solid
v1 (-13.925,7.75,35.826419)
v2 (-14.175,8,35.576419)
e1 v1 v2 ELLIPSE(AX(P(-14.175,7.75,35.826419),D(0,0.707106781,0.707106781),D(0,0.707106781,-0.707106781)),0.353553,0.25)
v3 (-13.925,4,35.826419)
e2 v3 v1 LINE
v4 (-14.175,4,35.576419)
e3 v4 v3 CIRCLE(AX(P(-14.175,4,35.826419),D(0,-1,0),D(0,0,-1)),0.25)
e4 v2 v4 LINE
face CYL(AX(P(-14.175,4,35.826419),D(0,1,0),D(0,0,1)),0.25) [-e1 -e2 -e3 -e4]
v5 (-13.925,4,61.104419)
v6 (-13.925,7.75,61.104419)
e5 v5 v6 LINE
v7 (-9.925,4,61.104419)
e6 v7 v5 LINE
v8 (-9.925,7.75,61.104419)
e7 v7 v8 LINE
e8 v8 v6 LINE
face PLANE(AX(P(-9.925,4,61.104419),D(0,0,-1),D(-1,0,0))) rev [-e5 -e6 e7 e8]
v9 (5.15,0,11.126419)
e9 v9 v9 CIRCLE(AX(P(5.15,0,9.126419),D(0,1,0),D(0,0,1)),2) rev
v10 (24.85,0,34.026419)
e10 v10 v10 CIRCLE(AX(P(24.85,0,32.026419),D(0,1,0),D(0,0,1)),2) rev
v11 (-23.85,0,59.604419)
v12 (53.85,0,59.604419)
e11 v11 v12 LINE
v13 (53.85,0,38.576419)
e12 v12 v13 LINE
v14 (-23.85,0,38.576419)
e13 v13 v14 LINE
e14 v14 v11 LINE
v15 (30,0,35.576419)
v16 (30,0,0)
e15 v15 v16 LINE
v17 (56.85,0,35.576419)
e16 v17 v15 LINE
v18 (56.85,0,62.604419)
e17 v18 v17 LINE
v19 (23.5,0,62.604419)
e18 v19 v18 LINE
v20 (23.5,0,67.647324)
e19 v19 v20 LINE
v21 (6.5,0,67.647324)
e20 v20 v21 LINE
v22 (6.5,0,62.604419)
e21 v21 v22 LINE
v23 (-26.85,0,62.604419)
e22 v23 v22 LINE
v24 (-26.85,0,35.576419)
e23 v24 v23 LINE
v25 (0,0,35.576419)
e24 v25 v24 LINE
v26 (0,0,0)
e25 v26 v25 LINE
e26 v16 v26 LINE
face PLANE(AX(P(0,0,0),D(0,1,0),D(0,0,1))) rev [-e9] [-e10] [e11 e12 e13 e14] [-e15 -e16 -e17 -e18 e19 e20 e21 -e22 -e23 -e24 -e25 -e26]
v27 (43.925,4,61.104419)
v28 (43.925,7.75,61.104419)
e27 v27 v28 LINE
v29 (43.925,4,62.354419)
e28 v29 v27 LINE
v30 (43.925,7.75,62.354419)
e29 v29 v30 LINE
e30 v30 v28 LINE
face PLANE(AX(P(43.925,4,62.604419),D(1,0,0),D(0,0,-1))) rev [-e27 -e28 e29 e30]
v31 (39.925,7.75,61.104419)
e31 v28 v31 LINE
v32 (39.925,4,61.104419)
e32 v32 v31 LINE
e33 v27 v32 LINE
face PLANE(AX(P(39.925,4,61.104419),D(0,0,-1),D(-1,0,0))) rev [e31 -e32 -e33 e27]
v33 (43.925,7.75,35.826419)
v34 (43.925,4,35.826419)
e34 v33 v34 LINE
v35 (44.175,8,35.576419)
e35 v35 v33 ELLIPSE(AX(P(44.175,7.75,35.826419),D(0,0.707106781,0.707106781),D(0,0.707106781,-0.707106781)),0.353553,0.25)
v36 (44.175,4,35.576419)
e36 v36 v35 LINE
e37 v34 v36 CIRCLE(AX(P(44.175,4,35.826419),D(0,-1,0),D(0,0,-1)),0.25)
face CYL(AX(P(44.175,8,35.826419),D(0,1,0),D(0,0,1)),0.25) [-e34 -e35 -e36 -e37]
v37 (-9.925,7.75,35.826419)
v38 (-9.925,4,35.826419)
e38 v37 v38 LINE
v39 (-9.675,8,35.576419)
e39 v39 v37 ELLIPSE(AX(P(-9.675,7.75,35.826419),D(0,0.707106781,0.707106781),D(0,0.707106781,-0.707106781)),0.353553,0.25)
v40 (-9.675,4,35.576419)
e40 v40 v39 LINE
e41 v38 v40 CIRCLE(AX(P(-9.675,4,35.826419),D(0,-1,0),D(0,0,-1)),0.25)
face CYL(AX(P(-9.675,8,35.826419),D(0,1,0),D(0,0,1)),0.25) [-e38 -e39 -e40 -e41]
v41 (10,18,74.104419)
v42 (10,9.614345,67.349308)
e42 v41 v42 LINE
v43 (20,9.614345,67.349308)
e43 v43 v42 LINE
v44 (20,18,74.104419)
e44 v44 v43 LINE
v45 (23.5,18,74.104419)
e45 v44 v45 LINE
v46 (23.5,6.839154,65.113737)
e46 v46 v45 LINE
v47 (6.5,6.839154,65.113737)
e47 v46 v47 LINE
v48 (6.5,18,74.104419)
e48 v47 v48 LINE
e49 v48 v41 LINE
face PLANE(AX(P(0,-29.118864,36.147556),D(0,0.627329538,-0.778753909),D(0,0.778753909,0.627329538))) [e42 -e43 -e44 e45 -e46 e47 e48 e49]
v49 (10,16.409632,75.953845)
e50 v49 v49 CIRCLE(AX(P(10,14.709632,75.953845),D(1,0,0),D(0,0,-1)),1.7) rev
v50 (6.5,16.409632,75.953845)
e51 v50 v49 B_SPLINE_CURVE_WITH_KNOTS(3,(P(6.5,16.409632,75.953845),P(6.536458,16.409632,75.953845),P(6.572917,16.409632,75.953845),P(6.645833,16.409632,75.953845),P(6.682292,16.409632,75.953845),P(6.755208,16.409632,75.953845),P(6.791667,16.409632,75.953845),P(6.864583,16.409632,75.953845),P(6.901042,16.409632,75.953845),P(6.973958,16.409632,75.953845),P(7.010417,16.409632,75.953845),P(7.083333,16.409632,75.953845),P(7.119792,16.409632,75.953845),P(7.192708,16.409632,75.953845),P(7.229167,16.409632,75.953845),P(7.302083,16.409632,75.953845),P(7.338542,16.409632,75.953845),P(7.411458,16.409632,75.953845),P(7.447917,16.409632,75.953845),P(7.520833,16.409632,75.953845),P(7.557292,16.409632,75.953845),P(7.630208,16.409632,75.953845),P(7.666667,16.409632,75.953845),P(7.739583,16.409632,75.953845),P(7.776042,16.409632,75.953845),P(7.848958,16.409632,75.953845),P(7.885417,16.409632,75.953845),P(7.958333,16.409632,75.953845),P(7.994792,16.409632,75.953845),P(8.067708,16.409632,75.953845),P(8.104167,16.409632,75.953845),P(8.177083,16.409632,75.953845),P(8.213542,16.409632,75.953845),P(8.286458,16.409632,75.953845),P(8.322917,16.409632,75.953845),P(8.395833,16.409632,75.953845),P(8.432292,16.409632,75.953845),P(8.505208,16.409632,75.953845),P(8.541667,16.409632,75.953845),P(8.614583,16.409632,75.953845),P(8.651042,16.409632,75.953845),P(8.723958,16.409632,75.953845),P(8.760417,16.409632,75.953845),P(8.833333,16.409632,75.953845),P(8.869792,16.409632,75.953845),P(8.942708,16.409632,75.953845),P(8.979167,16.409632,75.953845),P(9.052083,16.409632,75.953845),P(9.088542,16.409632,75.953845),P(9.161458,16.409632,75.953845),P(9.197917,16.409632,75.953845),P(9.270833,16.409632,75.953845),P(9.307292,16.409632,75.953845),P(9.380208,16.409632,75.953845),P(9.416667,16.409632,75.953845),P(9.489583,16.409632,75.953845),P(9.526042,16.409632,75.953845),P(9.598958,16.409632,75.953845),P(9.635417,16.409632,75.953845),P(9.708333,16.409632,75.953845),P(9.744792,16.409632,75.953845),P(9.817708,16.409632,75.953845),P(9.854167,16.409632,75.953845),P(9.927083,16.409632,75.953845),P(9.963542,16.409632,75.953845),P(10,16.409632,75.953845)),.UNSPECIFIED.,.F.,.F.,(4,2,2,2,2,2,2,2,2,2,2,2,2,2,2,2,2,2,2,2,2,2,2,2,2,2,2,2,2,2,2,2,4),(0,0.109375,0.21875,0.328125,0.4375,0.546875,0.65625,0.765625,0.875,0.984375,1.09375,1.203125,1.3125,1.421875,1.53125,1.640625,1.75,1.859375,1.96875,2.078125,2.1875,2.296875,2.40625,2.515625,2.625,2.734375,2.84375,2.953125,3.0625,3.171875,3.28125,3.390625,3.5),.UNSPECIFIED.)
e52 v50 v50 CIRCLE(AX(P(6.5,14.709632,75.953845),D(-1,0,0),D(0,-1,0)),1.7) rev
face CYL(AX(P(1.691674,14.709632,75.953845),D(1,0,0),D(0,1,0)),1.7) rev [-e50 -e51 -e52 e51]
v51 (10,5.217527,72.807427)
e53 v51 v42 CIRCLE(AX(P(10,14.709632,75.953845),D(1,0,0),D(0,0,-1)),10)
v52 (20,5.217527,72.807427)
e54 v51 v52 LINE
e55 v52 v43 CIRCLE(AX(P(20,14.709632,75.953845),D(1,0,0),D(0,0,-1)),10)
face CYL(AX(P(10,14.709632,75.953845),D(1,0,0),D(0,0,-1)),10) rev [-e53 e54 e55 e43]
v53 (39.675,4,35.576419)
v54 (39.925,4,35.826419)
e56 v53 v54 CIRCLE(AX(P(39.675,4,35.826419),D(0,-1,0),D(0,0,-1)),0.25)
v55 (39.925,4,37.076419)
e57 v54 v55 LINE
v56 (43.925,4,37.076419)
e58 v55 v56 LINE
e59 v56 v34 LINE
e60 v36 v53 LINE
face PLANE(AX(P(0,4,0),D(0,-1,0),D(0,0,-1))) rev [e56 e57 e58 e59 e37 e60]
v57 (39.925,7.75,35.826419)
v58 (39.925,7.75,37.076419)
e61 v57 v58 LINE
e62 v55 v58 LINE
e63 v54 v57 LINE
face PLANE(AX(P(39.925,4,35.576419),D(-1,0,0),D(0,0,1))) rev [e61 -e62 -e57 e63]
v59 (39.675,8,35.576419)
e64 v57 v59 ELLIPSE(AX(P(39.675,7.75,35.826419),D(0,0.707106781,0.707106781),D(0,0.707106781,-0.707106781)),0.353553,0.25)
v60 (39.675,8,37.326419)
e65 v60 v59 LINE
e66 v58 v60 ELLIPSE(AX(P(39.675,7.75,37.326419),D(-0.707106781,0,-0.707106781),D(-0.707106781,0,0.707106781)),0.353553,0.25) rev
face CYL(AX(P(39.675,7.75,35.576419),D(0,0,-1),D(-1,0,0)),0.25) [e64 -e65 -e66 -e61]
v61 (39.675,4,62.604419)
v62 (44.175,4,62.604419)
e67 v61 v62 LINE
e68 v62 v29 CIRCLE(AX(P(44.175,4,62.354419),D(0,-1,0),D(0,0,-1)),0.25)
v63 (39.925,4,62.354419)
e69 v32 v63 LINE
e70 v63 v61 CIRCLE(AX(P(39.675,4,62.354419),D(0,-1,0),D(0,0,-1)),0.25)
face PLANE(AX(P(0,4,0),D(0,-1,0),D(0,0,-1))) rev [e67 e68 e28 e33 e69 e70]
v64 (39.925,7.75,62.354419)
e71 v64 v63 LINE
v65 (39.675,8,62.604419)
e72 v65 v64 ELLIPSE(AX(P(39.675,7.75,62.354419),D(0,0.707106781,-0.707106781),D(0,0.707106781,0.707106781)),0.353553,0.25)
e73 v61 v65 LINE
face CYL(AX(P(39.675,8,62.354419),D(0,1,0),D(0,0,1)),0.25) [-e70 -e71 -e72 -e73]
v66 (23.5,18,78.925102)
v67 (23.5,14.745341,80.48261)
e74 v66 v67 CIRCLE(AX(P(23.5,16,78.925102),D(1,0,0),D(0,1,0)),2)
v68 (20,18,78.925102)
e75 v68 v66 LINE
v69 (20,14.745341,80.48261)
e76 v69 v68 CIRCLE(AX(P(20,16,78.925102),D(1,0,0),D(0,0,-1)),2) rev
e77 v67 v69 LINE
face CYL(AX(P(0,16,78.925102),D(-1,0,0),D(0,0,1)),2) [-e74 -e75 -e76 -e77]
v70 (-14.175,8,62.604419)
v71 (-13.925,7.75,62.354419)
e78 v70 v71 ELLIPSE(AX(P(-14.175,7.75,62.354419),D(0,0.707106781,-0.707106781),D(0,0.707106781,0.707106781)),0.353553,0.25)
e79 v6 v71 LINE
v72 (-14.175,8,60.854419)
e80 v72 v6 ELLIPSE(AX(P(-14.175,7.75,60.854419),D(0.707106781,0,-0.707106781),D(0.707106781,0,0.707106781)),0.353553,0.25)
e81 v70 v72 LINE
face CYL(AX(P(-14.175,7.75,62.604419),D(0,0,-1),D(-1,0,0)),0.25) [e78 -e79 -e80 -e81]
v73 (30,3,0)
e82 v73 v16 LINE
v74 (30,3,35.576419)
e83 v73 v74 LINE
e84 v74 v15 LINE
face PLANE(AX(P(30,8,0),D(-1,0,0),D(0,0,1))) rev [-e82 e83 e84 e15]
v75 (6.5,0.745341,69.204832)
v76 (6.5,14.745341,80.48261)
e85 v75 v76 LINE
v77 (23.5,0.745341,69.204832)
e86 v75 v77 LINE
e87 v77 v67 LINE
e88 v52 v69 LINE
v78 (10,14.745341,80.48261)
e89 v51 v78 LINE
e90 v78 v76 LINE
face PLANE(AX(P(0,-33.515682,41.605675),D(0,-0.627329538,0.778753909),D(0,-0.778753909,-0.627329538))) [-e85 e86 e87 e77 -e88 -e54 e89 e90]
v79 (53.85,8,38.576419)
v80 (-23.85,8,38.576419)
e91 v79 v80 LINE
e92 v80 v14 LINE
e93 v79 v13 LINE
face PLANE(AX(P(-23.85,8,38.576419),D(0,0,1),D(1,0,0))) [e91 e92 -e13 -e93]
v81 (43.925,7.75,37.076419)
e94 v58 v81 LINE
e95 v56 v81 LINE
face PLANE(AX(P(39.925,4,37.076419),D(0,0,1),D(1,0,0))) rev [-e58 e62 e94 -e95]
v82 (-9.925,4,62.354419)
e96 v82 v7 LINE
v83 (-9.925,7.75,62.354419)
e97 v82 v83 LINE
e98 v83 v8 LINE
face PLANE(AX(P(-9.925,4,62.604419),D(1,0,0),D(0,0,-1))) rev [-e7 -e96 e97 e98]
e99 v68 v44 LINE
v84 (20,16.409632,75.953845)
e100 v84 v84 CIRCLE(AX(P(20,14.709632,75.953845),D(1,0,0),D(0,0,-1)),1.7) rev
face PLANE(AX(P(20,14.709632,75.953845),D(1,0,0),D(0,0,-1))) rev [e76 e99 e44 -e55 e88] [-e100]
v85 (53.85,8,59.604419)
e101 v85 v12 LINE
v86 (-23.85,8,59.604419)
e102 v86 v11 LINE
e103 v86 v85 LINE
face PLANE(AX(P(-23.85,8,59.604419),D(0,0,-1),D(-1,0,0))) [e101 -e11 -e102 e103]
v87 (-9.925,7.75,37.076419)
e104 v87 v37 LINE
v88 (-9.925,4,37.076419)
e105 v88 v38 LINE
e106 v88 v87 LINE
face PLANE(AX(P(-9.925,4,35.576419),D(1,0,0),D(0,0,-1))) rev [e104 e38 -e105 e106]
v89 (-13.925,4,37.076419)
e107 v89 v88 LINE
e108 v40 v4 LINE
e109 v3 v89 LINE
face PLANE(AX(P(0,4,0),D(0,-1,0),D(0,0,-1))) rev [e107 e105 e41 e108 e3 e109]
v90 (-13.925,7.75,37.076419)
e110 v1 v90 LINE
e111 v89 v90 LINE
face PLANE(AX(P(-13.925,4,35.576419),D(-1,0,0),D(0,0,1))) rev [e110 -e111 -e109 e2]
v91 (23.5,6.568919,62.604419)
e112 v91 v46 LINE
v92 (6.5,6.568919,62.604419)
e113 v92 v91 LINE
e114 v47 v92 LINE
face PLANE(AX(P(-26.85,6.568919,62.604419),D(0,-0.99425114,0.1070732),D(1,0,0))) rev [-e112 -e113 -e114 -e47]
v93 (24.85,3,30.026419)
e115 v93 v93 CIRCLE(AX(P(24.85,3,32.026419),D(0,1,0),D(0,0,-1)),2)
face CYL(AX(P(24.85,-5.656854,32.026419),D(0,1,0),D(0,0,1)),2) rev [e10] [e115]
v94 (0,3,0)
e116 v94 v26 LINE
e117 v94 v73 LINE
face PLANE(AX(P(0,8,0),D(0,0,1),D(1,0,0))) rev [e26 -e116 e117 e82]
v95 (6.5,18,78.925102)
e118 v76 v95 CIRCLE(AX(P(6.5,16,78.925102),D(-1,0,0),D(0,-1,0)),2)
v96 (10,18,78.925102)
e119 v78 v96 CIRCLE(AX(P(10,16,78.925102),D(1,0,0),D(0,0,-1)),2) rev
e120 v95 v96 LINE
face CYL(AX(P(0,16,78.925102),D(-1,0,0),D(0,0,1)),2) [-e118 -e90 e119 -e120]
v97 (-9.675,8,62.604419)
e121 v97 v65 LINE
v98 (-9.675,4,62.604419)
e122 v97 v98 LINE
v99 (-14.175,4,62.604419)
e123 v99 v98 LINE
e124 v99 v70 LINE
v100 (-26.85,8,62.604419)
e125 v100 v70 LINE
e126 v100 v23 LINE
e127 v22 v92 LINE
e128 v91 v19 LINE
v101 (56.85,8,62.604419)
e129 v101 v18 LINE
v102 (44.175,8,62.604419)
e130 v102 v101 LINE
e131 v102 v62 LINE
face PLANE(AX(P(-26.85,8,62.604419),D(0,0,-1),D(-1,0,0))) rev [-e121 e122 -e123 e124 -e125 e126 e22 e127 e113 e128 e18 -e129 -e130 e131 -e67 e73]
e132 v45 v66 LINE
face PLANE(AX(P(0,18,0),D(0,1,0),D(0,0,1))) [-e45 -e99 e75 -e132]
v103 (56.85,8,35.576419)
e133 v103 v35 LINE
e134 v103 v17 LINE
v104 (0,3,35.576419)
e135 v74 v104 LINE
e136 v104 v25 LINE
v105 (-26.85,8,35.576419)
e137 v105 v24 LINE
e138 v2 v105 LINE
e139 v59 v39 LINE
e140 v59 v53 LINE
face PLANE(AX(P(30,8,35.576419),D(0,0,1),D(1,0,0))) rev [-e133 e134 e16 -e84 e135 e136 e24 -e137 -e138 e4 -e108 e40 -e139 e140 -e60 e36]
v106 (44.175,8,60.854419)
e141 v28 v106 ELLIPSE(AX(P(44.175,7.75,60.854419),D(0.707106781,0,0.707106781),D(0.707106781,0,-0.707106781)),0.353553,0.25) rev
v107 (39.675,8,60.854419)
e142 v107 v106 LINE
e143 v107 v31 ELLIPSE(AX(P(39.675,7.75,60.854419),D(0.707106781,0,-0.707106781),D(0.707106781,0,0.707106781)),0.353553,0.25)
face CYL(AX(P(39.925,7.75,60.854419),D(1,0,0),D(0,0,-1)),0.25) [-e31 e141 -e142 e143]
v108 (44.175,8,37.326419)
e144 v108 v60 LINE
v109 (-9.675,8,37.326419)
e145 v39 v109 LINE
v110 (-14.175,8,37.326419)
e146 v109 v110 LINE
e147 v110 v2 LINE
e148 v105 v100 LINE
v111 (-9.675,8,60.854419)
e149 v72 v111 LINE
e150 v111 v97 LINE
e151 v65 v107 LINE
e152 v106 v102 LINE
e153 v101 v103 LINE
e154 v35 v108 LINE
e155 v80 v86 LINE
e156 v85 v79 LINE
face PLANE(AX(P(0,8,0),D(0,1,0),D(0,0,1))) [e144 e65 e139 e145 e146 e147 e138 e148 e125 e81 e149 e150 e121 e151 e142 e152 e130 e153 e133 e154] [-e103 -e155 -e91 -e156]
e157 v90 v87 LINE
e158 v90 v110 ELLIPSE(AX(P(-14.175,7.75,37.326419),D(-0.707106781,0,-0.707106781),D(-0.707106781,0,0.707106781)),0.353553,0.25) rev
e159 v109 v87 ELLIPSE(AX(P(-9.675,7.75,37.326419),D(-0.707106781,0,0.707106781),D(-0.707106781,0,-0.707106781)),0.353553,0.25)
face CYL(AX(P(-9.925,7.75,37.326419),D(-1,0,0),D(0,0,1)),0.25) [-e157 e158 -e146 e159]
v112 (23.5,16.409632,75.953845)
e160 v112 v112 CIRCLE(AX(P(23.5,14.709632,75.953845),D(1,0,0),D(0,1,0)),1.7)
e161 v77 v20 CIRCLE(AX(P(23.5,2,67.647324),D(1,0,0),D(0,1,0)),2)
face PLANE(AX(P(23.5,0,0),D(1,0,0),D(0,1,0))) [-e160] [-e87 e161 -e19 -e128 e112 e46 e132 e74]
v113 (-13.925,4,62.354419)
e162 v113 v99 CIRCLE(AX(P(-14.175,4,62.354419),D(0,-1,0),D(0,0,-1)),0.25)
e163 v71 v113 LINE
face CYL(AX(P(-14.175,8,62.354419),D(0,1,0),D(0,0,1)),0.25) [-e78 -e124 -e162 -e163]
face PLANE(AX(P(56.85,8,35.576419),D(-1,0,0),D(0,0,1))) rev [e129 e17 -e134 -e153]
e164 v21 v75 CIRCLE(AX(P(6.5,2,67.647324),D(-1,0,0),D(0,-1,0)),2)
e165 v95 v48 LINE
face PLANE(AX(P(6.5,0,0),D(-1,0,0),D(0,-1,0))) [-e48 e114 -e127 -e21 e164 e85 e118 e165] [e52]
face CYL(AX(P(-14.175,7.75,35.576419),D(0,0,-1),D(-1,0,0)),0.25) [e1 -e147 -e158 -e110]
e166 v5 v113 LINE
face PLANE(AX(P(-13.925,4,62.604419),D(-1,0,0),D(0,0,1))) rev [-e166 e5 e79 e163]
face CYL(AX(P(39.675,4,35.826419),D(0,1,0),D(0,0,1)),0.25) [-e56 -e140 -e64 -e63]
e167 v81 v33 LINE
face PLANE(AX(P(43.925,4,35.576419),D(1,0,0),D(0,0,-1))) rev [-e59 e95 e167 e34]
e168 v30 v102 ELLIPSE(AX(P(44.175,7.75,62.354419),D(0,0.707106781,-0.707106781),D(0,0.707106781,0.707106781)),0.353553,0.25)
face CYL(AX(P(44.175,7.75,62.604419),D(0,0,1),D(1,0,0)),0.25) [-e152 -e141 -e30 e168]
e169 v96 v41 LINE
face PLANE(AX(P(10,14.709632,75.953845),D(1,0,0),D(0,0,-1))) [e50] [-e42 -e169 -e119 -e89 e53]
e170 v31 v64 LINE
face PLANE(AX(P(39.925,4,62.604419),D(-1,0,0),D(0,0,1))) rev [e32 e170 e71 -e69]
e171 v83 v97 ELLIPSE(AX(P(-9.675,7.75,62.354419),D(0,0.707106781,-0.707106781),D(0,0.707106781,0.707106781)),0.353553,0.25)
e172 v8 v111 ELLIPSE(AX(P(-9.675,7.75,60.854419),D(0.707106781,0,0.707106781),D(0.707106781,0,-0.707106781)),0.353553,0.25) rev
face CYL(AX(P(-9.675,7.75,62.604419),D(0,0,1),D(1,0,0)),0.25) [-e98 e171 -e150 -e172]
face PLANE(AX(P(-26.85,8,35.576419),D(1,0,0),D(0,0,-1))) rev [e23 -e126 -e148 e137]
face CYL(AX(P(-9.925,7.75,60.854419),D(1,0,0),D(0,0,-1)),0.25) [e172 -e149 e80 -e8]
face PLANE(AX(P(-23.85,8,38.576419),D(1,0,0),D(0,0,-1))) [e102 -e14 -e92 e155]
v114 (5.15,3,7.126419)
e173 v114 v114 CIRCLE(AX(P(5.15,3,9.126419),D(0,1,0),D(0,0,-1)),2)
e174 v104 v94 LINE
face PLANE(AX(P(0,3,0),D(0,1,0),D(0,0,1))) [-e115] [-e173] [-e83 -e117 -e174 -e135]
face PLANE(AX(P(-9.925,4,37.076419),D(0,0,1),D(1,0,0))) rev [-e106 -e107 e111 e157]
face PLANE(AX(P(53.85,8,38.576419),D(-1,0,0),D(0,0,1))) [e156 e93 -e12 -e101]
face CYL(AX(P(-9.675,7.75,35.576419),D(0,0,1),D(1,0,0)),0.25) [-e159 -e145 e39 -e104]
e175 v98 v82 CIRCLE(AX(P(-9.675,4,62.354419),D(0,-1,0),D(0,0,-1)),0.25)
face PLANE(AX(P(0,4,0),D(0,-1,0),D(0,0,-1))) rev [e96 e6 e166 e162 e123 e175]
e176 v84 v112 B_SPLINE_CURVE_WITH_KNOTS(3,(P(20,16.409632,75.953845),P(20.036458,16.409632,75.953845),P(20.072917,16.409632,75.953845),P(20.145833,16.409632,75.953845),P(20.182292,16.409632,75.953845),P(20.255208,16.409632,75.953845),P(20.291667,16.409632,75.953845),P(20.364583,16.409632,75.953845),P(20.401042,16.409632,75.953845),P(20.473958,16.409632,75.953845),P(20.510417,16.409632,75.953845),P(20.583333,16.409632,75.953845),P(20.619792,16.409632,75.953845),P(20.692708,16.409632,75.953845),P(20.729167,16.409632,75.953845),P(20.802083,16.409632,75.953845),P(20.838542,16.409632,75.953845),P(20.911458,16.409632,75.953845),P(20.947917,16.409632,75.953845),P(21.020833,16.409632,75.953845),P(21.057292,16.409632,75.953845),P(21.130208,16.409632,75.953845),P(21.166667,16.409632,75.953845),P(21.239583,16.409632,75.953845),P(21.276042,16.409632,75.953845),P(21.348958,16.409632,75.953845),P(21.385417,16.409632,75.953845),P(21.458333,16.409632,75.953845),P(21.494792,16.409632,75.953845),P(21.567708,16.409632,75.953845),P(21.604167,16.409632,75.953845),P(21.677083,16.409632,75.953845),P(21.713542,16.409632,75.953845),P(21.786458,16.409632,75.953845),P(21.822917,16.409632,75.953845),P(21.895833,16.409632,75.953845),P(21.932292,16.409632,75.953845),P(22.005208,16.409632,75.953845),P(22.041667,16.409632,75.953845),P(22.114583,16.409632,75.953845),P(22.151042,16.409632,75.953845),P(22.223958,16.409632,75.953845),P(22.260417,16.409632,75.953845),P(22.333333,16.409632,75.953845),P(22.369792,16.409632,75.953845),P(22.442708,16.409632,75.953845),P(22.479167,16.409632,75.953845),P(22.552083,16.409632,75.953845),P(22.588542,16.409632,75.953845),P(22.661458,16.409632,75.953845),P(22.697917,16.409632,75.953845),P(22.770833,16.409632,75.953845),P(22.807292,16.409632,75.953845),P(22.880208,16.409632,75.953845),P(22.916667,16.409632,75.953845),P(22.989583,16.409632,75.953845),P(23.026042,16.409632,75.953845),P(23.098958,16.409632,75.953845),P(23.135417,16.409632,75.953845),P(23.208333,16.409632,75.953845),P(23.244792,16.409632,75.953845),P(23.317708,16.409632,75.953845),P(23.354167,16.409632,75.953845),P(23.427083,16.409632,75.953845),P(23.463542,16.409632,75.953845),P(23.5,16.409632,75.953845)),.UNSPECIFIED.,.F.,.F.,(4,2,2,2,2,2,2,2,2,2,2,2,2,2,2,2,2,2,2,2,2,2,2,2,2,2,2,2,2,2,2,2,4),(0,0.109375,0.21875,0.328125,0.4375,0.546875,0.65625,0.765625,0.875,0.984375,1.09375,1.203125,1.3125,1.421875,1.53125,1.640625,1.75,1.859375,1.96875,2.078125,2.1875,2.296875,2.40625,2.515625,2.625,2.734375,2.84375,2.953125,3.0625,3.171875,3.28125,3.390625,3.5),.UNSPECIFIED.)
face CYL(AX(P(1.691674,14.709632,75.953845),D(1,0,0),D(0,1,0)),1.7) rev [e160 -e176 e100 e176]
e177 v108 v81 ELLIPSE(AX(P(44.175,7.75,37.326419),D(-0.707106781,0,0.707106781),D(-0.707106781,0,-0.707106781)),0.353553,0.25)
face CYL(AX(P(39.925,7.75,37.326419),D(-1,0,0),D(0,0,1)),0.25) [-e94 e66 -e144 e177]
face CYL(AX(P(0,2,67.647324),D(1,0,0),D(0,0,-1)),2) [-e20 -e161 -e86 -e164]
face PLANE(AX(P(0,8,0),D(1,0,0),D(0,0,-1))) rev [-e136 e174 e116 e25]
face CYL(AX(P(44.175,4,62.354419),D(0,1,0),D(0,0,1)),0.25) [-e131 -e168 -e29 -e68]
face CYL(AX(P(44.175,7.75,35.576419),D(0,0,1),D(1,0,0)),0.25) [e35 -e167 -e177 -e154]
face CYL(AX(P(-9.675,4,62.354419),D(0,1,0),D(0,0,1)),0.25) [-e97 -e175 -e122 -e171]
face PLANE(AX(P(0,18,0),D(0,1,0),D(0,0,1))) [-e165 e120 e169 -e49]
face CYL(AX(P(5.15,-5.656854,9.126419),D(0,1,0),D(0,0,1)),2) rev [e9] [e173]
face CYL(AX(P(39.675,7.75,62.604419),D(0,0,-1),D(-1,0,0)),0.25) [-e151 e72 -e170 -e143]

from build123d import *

# Parameters (mm, degrees)
SKETCH5_W           = 77.7
SKETCH5_H           = 21.028
BOSS_EXTRUDE3_DEPTH = 8
SKETCH6_W           = 30
SKETCH6_H           = 35.57641867
CUT_EXTRUDE4_DEPTH  = 5
SKETCH10_R          = 1.7
CUT_EXTRUDE5_DEPTH  = 17
FILLET4_R           = 2
FILLET5_R           = 2
CHAMFER1_START      = 6.5
CHAMFER1_DEPTH      = 17
SKETCH11_R          = 10
CUT_EXTRUDE6_DEPTH  = 5
SKETCH12_R          = 2
CUT_EXTRUDE7_DEPTH  = 3
SKETCH13_W          = 4
SKETCH13_H          = 1.5
CUT_EXTRUDE8_DEPTH  = 4
FILLET6_R           = 0.25


with BuildPart() as part:
    # Sketch5 → Boss-Extrude3 (new body)
    with BuildSketch(Plane(origin=(0, 0, 0), x_dir=(1, 0, 0), z_dir=(0, 1, 0))):
        Polygon((30, -35.57641867), (56.85, -35.57641867), (56.85, -62.60441867), (-26.85, -62.60441867), (-26.85, -35.57641867), (0, -35.57641867), (0, 0), (30, 0), align=None)
        with Locations((15, -49.09041867)):
            Rectangle(SKETCH5_W, SKETCH5_H, mode=Mode.SUBTRACT)
    extrude(amount=BOSS_EXTRUDE3_DEPTH)

    # Sketch6 → Cut-Extrude4 (cut)
    with BuildSketch(Plane(origin=(0, 8, 0), x_dir=(1, 0, 0), z_dir=(0, 1, 0))):
        with Locations((15, -17.788209335)):
            Rectangle(SKETCH6_W, SKETCH6_H)
    extrude(amount=-CUT_EXTRUDE4_DEPTH, mode=Mode.SUBTRACT)

    # Sketch7 → Loft1 section 0
    with BuildSketch(Plane.XZ):
        with BuildLine():
            Line((6.5, 59.60441867), (23.5, 59.60441867))
            Line((23.5, 59.60441867), (23.5, 68.60441867))
            Line((23.5, 68.60441867), (6.5, 68.60441867))
            Line((6.5, 68.60441867), (6.5, 59.60441867))
        make_face()
    # Sketch9 → Loft1 section 1
    with BuildSketch(Plane(origin=(0, 18, 0), x_dir=(-1, 0, 0), z_dir=(0, -1, 0))):
        with BuildLine():
            Line((-23.5, -83.10441867), (-6.5, -83.10441867))
            Line((-6.5, -83.10441867), (-6.5, -74.10441867))
            Line((-6.5, -74.10441867), (-23.5, -74.10441867))
            Line((-23.5, -74.10441867), (-23.5, -83.10441867))
        make_face()
    loft()

    # Sketch10 → Cut-Extrude5 (cut)
    with BuildSketch(Plane(origin=(23.5, 0, 0), x_dir=(0, 0, -1), z_dir=(1, 0, 0))):
        with Locations(Location((-75.953844744, 14.709632368, 0), (0, 0, 90))):
            Circle(SKETCH10_R)
    extrude(amount=-CUT_EXTRUDE5_DEPTH, mode=Mode.SUBTRACT)

    # Fillet4
    fillet4_edges = [part.edges().sort_by_distance(p)[0] for p in [
        (15, 0, 68.60441867),
    ]]
    fillet(fillet4_edges, radius=FILLET4_R)

    # Fillet5
    fillet5_edges = [part.edges().sort_by_distance(p)[0] for p in [
        (15, 18, 83.10441867),
    ]]
    fillet(fillet5_edges, radius=FILLET5_R)

    # Chamfer1: read off the stored shape, not the designer's step
    # Chamfer1 outline → Chamfer1 (add)
    with BuildSketch(Plane.YZ.offset(CHAMFER1_START)):
        Polygon((6.568919305, 62.60441867), (6.839153567, 65.113736821), (3.724137931, 62.60441867), align=None)
    extrude(amount=CHAMFER1_DEPTH)

    # Sketch11 → Cut-Extrude6 (cut, symmetric)
    with BuildSketch(Plane(origin=(15, 0, 0), x_dir=(0, 0, -1), z_dir=(1, 0, 0))):
        with Locations((-75.953844744, 14.709632368)):
            Circle(SKETCH11_R)
    extrude(amount=CUT_EXTRUDE6_DEPTH, both=True, mode=Mode.SUBTRACT)

    # Sketch12 → Cut-Extrude7 (cut)
    with BuildSketch(Plane(origin=(0, 3, 0), x_dir=(1, 0, 0), z_dir=(0, 1, 0))):
        with Locations(Location((24.85, -32.02641867, 0), (0, 0, 270))):
            Circle(SKETCH12_R)
        with Locations(Location((5.15, -9.12641867, 0), (0, 0, 270))):
            Circle(SKETCH12_R)
    extrude(amount=-CUT_EXTRUDE7_DEPTH, mode=Mode.SUBTRACT)

    # Sketch13 → Cut-Extrude8 (cut)
    with BuildSketch(Plane(origin=(0, 8, 0), x_dir=(1, 0, 0), z_dir=(0, 1, 0))):
        with Locations((-11.925, -36.32641867)):
            Rectangle(SKETCH13_W, SKETCH13_H)
        with Locations((-11.925, -61.85441867)):
            Rectangle(SKETCH13_W, SKETCH13_H)
        with Locations((41.925, -61.85441867)):
            Rectangle(SKETCH13_W, SKETCH13_H)
        with Locations((41.925, -36.32641867)):
            Rectangle(SKETCH13_W, SKETCH13_H)
    extrude(amount=-CUT_EXTRUDE8_DEPTH, mode=Mode.SUBTRACT)

    # Fillet6
    fillet6_edges = [part.edges().sort_by_distance(p)[0] for p in [
        (-9.925, 6, 62.60441867),
        (-13.925, 6, 62.60441867),
        (-9.925, 8, 61.85441867),
        (-11.925, 8, 61.10441867),
        (-13.925, 8, 61.85441867),
        (39.925, 6, 35.57641867),
        (43.925, 6, 35.57641867),
        (39.925, 8, 36.32641867),
        (41.925, 8, 37.07641867),
        (43.925, 8, 36.32641867),
        (39.925, 6, 62.60441867),
        (43.925, 6, 62.60441867),
        (39.925, 8, 61.85441867),
        (43.925, 8, 61.85441867),
        (41.925, 8, 61.10441867),
        (-9.925, 6, 35.57641867),
        (-13.925, 6, 35.57641867),
        (-9.925, 8, 36.32641867),
        (-13.925, 8, 36.32641867),
        (-11.925, 8, 37.07641867),
    ]]
    fillet(fillet6_edges, radius=FILLET6_R)


solid = part.part
